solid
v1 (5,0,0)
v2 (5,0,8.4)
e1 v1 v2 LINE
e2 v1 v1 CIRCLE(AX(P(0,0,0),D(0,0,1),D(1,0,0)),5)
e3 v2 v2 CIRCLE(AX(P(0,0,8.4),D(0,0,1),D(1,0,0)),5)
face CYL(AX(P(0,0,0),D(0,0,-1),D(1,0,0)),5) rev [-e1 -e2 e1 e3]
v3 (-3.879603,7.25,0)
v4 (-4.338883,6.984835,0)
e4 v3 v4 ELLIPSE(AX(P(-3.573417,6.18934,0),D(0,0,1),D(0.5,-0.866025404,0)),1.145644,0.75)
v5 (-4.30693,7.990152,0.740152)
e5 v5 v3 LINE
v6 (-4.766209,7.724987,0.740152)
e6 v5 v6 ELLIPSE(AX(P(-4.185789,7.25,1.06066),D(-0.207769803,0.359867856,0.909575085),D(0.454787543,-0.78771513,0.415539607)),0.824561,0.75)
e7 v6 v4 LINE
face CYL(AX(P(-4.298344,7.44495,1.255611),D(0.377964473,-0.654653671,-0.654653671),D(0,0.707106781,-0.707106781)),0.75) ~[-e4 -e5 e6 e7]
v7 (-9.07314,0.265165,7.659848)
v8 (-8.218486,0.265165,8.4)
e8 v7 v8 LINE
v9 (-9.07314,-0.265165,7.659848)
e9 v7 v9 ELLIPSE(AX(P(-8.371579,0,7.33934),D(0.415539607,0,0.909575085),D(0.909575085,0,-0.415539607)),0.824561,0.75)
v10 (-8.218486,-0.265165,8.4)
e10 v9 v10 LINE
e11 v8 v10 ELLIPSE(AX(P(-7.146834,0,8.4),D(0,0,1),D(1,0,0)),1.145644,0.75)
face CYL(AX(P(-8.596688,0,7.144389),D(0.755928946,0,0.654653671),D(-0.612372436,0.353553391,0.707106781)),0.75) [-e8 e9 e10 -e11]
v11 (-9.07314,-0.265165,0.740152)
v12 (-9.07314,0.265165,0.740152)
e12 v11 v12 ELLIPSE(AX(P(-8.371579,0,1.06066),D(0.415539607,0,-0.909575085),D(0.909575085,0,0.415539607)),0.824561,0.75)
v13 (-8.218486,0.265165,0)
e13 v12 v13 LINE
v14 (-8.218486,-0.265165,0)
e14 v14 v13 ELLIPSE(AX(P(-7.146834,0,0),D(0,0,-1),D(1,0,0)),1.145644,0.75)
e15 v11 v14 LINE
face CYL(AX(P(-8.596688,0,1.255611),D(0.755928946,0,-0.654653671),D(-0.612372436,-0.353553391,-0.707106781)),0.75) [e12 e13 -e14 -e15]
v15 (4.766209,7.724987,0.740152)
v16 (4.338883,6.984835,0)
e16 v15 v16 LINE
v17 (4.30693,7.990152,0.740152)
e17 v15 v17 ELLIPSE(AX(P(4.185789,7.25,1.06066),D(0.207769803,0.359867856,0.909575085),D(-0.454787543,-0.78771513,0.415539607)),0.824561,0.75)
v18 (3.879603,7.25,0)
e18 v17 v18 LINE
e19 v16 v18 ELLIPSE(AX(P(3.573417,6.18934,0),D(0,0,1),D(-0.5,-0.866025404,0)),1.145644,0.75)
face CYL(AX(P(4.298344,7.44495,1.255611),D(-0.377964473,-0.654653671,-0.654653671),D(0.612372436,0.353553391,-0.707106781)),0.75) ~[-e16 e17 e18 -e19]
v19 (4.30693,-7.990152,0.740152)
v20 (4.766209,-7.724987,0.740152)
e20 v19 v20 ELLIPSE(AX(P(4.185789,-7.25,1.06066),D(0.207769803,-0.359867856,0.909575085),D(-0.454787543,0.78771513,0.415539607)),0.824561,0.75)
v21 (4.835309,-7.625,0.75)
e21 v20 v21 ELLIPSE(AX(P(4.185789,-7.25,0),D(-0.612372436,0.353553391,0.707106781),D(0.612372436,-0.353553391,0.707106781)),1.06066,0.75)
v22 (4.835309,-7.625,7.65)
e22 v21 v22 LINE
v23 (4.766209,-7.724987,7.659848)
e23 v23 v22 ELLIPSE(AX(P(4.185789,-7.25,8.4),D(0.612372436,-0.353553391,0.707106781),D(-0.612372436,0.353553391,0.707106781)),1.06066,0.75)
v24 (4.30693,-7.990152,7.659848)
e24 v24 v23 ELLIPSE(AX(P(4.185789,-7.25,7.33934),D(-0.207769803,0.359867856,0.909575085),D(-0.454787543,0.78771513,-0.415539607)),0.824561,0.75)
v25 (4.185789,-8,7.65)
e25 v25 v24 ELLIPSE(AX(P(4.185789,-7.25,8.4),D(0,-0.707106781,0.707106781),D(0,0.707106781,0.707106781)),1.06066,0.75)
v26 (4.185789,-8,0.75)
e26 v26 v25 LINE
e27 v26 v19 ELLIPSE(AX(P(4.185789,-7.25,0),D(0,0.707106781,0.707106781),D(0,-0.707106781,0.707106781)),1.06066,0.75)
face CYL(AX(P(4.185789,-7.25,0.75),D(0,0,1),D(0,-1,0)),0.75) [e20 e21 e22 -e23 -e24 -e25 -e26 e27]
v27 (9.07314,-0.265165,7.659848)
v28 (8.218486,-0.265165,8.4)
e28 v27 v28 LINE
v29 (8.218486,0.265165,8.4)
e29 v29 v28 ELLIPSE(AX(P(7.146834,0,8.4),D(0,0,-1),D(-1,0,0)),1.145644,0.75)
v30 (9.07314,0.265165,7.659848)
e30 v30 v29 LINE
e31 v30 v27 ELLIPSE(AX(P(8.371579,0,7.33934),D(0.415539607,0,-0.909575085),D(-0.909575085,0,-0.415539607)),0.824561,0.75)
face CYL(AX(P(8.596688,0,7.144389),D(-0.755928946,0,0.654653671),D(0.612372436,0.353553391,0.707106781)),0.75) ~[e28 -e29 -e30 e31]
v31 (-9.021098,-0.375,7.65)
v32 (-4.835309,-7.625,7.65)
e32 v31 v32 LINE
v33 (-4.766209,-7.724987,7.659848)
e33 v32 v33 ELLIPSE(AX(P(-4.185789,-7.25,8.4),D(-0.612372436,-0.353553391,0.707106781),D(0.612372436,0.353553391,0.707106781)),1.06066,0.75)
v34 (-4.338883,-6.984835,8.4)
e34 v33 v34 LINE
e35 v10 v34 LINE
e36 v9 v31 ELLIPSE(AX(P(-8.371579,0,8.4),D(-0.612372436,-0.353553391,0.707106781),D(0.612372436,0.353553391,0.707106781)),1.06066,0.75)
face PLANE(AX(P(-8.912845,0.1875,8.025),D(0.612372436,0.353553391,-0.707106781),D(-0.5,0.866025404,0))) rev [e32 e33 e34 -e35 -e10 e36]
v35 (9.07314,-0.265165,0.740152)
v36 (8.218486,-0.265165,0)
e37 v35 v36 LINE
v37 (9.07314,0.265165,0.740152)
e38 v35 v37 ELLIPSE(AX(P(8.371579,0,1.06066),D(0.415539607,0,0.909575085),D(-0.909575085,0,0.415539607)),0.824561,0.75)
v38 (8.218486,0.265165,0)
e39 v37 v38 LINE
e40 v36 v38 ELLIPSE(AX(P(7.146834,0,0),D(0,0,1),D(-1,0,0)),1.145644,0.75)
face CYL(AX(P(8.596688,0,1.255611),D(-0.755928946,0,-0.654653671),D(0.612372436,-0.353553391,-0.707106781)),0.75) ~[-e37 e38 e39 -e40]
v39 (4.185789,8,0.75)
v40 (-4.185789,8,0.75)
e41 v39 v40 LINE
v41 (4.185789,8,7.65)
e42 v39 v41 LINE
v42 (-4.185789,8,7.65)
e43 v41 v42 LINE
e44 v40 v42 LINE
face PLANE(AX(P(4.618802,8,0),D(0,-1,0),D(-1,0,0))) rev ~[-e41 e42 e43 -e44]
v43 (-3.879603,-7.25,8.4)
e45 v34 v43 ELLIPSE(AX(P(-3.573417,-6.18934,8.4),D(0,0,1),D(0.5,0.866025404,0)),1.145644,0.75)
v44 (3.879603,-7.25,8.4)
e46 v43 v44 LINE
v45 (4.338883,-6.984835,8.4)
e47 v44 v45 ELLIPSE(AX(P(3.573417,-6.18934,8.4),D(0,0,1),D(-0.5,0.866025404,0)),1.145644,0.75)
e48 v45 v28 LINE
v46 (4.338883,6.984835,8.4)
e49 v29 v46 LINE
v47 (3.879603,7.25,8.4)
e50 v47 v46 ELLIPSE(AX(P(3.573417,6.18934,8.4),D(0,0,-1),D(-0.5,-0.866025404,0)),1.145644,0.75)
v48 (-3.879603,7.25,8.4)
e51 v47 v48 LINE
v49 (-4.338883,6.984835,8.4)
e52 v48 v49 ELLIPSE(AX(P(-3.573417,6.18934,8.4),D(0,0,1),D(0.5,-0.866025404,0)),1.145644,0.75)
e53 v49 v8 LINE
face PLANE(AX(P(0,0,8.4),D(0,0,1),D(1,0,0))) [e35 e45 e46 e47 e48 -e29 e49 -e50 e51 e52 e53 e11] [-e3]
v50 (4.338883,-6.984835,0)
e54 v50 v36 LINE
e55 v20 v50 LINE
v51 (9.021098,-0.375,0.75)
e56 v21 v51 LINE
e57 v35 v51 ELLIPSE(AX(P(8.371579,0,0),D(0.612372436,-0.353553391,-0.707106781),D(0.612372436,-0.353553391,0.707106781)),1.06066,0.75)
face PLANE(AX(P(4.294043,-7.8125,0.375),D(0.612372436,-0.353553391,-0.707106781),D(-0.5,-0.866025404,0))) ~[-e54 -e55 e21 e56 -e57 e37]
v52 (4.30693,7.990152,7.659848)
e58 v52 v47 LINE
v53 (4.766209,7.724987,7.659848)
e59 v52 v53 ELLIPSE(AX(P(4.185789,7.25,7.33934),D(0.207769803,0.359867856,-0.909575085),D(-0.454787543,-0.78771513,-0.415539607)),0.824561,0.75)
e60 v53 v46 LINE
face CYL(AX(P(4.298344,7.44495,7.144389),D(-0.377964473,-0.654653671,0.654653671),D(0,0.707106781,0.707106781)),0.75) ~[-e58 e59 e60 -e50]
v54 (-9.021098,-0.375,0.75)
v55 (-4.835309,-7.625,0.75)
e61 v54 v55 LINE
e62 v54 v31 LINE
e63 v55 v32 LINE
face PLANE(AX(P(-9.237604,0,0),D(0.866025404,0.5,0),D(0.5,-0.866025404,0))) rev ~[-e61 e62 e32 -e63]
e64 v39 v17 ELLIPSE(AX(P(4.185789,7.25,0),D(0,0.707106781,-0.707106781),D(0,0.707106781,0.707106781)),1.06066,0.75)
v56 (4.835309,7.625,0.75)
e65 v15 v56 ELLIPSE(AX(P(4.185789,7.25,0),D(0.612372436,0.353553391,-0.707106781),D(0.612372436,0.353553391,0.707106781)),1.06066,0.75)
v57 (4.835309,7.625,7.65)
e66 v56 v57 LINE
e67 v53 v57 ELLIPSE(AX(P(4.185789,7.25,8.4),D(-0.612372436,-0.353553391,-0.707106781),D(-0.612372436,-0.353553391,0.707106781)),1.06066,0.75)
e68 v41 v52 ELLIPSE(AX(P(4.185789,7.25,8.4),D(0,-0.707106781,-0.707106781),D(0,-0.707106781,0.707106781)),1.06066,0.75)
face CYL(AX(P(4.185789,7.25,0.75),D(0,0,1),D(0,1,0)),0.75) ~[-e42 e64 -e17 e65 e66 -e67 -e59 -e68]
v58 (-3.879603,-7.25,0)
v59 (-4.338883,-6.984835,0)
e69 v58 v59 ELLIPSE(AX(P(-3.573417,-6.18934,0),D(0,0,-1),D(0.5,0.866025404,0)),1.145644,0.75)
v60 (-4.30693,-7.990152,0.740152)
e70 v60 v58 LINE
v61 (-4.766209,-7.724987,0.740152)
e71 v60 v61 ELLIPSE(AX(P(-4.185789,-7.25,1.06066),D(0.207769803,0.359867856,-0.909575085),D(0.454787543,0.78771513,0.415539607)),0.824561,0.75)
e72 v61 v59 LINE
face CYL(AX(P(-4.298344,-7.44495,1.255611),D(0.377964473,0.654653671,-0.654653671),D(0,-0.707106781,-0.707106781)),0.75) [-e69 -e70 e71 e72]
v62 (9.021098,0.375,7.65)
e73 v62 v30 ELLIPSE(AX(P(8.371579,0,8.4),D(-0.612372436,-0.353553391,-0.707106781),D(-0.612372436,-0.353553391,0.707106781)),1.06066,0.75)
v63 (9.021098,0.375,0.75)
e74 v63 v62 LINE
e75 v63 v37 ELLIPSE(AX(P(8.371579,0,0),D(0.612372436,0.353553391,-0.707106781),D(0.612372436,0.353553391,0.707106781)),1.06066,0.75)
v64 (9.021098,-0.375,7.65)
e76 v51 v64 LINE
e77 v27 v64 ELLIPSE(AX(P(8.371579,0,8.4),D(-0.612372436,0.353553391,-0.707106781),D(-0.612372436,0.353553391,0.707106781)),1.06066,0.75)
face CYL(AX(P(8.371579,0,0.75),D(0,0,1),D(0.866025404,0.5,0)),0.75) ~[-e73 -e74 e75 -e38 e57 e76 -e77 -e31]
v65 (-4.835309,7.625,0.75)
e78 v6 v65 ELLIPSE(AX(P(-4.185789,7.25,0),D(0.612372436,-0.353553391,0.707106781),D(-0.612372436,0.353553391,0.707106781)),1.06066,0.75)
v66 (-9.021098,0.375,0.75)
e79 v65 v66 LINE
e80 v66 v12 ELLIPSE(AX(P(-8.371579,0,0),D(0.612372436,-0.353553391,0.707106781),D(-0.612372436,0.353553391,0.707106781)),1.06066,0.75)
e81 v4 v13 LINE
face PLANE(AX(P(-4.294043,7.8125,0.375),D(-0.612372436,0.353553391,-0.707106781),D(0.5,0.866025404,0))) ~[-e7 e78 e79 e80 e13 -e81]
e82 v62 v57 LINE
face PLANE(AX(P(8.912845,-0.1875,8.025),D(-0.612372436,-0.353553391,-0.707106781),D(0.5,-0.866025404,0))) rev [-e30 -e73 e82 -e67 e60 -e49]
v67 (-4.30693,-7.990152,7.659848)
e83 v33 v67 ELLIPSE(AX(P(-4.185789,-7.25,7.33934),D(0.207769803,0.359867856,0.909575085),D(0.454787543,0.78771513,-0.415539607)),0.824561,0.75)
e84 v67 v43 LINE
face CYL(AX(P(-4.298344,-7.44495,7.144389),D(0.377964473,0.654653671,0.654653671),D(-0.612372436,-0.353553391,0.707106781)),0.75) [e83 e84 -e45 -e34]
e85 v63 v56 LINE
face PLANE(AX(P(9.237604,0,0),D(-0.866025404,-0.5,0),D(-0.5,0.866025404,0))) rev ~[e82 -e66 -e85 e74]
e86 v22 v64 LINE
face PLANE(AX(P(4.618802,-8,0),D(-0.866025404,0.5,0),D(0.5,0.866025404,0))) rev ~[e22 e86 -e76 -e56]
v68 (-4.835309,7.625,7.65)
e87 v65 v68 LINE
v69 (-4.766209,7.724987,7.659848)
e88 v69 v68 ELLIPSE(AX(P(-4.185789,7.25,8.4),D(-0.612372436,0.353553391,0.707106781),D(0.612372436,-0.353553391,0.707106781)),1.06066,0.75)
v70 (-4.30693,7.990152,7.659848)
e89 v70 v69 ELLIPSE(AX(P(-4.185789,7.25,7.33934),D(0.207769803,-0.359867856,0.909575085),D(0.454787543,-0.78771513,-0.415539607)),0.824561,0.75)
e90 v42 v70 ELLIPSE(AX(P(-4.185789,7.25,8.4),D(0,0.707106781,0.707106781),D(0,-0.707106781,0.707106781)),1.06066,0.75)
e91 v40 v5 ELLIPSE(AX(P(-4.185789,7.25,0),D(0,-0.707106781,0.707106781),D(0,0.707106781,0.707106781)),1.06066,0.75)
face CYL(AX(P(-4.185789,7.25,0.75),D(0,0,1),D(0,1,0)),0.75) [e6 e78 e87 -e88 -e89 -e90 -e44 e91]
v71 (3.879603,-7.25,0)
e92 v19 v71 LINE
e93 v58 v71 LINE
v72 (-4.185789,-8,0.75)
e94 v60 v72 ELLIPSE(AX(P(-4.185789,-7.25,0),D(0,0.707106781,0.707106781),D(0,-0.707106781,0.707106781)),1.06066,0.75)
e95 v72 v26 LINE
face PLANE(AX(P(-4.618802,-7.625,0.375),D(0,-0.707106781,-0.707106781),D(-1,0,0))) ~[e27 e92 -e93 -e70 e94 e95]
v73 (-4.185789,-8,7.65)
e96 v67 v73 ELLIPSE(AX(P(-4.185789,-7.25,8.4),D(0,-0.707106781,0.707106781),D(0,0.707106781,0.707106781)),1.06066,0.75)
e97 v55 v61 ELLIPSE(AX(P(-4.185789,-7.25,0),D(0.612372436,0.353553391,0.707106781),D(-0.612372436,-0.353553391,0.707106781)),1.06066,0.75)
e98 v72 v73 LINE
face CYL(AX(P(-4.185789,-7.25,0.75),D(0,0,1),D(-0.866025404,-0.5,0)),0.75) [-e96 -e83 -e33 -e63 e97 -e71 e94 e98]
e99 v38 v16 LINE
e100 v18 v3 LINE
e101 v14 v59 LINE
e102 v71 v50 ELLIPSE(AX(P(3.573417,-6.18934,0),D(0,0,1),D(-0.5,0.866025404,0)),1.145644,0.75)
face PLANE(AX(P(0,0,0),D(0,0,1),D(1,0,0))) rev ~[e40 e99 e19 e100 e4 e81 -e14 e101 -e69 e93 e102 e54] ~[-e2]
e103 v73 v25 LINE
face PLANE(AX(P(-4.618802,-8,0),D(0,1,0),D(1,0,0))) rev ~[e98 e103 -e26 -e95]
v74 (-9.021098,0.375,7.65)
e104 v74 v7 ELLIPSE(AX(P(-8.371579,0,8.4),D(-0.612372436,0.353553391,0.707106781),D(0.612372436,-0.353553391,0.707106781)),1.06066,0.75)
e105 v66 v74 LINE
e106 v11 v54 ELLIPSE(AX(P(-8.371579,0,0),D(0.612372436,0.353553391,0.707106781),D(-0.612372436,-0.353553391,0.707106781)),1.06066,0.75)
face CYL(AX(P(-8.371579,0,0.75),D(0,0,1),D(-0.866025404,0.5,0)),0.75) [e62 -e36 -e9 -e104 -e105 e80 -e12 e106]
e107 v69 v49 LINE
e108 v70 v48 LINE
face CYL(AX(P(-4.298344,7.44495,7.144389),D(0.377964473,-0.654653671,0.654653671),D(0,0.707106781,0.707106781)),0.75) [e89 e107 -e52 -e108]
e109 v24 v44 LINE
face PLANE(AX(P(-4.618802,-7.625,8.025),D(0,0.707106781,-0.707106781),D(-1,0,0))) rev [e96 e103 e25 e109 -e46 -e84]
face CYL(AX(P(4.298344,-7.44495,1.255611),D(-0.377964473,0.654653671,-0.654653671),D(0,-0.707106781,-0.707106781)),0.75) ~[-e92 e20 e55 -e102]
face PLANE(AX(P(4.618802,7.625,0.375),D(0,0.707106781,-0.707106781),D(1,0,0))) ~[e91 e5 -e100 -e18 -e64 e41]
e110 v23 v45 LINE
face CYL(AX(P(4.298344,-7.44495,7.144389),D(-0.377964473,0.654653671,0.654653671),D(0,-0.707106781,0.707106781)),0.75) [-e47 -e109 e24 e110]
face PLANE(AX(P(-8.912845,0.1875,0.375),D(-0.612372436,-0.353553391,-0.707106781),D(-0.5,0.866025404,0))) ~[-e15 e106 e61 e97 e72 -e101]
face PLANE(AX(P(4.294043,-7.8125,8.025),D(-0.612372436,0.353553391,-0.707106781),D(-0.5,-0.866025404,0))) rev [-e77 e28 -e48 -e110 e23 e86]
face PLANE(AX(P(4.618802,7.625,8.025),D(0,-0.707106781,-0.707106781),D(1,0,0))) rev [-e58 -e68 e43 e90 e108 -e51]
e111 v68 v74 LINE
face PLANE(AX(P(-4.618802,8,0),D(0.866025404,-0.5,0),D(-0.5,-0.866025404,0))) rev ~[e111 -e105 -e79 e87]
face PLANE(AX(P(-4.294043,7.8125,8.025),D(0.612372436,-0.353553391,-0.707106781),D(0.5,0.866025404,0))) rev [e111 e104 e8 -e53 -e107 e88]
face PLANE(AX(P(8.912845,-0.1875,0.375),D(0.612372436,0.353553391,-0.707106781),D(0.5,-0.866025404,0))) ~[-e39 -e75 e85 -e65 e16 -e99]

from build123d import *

# Parameters (mm, degrees)
F0_R     = 5
F1_DEPTH = 8.4
F2_SIZE  = 0.75
F3_F1_R  = 0.75
F3_F2_R  = 0.75
F3_F3_R  = 0.75
F3_F4_R  = 0.75
F3_F5_R  = 0.75
F3_F6_R  = 0.75
F3_F7_R  = 0.75
F3_F8_R  = 0.75
F3_F9_R  = 0.75
F3_F10_R = 0.75
F3_F11_R = 0.75
F3_F12_R = 0.75
F3_F13_R = 0.75
F3_F14_R = 0.75
F3_F15_R = 0.75
F3_F16_R = 0.75
F3_F17_R = 0.75
F3_F18_R = 0.75


with BuildPart() as f1:
    # F0 (on Top) → F1 (new body)
    with BuildSketch(Plane.XY):
        Polygon((4.6188021535, 8), (-4.6188021535, 8), (-9.237604307, 0), (-4.6188021535, -8), (4.6188021535, -8), (9.237604307, 0), align=None)
        Circle(F0_R, mode=Mode.SUBTRACT)
    extrude(amount=F1_DEPTH)

    # F2
    f2_edges = [f1.edges().sort_by_distance(p)[0] for p in [
        (0, -8, 8.4),
        (-6.928203, -4, 8.4),
        (-6.928203, 4, 8.4),
        (0, 8, 8.4),
        (6.928203, 4, 8.4),
        (6.928203, -4, 8.4),
        (6.928203, -4, 0),
        (0, -8, 0),
        (-6.928203, -4, 0),
        (-6.928203, 4, 0),
        (0, 8, 0),
        (6.928203, 4, 0),
    ]]
    chamfer(f2_edges, length=F2_SIZE)

    # F3: fillet of radius 0.75 on 18 edges, made by hand

    # F3_f1
    f3_f1_edges = [f1.edges().sort_by_distance(p)[0] for p in [
        (4.6188021535, 8, 4.2),
    ]]
    fillet(f3_f1_edges, radius=F3_F1_R)

    # F3_f2
    f3_f2_edges = [f1.edges().sort_by_distance(p)[0] for p in [
        (-4.6188021535, 8, 4.2),
    ]]
    fillet(f3_f2_edges, radius=F3_F2_R)

    # F3_f3
    f3_f3_edges = [f1.edges().sort_by_distance(p)[0] for p in [
        (9.237604307, 0, 4.2),
    ]]
    fillet(f3_f3_edges, radius=F3_F3_R)

    # F3_f4
    f3_f4_edges = [f1.edges().sort_by_distance(p)[0] for p in [
        (4.3732894516, 7.5747595264, 0.3247595264),
    ]]
    fillet(f3_f4_edges, radius=F3_F4_R)

    # F3_f5
    f3_f5_edges = [f1.edges().sort_by_distance(p)[0] for p in [
        (-4.3732894516, 7.5747595264, 0.3247595264),
    ]]
    fillet(f3_f5_edges, radius=F3_F5_R)

    # F3_f6
    f3_f6_edges = [f1.edges().sort_by_distance(p)[0] for p in [
        (4.3732894516, 7.5747595264, 8.0752404736),
    ]]
    fillet(f3_f6_edges, radius=F3_F6_R)

    # F3_f7
    f3_f7_edges = [f1.edges().sort_by_distance(p)[0] for p in [
        (-4.3732894516, 7.5747595264, 8.0752404736),
    ]]
    fillet(f3_f7_edges, radius=F3_F7_R)

    # F3_f8
    f3_f8_edges = [f1.edges().sort_by_distance(p)[0] for p in [
        (-9.237604307, 0, 4.2),
    ]]
    fillet(f3_f8_edges, radius=F3_F8_R)

    # F3_f9
    f3_f9_edges = [f1.edges().sort_by_distance(p)[0] for p in [
        (4.6188021535, -8, 4.2),
    ]]
    fillet(f3_f9_edges, radius=F3_F9_R)

    # F3_f10
    f3_f10_edges = [f1.edges().sort_by_distance(p)[0] for p in [
        (8.7465789032, 0, 0.3247595264),
    ]]
    fillet(f3_f10_edges, radius=F3_F10_R)

    # F3_f11
    f3_f11_edges = [f1.edges().sort_by_distance(p)[0] for p in [
        (8.7465789032, 0, 8.0752404736),
    ]]
    fillet(f3_f11_edges, radius=F3_F11_R)

    # F3_f12
    f3_f12_edges = [f1.edges().sort_by_distance(p)[0] for p in [
        (-8.7465789032, 0, 0.3247595264),
    ]]
    fillet(f3_f12_edges, radius=F3_F12_R)

    # F3_f13
    f3_f13_edges = [f1.edges().sort_by_distance(p)[0] for p in [
        (-8.7465789032, 0, 8.0752404736),
    ]]
    fillet(f3_f13_edges, radius=F3_F13_R)

    # F3_f14
    f3_f14_edges = [f1.edges().sort_by_distance(p)[0] for p in [
        (-4.6188021535, -8, 4.2),
    ]]
    fillet(f3_f14_edges, radius=F3_F14_R)

    # F3_f15
    f3_f15_edges = [f1.edges().sort_by_distance(p)[0] for p in [
        (4.3732894516, -7.5747595264, 0.3247595264),
    ]]
    fillet(f3_f15_edges, radius=F3_F15_R)

    # F3_f16
    f3_f16_edges = [f1.edges().sort_by_distance(p)[0] for p in [
        (4.3732894516, -7.5747595264, 8.0752404736),
    ]]
    fillet(f3_f16_edges, radius=F3_F16_R)

    # F3_f17
    f3_f17_edges = [f1.edges().sort_by_distance(p)[0] for p in [
        (-4.3732894516, -7.5747595264, 0.3247595264),
    ]]
    fillet(f3_f17_edges, radius=F3_F17_R)

    # F3_f18
    f3_f18_edges = [f1.edges().sort_by_distance(p)[0] for p in [
        (-4.3732894516, -7.5747595264, 8.0752404736),
    ]]
    fillet(f3_f18_edges, radius=F3_F18_R)


solid = f1.part
